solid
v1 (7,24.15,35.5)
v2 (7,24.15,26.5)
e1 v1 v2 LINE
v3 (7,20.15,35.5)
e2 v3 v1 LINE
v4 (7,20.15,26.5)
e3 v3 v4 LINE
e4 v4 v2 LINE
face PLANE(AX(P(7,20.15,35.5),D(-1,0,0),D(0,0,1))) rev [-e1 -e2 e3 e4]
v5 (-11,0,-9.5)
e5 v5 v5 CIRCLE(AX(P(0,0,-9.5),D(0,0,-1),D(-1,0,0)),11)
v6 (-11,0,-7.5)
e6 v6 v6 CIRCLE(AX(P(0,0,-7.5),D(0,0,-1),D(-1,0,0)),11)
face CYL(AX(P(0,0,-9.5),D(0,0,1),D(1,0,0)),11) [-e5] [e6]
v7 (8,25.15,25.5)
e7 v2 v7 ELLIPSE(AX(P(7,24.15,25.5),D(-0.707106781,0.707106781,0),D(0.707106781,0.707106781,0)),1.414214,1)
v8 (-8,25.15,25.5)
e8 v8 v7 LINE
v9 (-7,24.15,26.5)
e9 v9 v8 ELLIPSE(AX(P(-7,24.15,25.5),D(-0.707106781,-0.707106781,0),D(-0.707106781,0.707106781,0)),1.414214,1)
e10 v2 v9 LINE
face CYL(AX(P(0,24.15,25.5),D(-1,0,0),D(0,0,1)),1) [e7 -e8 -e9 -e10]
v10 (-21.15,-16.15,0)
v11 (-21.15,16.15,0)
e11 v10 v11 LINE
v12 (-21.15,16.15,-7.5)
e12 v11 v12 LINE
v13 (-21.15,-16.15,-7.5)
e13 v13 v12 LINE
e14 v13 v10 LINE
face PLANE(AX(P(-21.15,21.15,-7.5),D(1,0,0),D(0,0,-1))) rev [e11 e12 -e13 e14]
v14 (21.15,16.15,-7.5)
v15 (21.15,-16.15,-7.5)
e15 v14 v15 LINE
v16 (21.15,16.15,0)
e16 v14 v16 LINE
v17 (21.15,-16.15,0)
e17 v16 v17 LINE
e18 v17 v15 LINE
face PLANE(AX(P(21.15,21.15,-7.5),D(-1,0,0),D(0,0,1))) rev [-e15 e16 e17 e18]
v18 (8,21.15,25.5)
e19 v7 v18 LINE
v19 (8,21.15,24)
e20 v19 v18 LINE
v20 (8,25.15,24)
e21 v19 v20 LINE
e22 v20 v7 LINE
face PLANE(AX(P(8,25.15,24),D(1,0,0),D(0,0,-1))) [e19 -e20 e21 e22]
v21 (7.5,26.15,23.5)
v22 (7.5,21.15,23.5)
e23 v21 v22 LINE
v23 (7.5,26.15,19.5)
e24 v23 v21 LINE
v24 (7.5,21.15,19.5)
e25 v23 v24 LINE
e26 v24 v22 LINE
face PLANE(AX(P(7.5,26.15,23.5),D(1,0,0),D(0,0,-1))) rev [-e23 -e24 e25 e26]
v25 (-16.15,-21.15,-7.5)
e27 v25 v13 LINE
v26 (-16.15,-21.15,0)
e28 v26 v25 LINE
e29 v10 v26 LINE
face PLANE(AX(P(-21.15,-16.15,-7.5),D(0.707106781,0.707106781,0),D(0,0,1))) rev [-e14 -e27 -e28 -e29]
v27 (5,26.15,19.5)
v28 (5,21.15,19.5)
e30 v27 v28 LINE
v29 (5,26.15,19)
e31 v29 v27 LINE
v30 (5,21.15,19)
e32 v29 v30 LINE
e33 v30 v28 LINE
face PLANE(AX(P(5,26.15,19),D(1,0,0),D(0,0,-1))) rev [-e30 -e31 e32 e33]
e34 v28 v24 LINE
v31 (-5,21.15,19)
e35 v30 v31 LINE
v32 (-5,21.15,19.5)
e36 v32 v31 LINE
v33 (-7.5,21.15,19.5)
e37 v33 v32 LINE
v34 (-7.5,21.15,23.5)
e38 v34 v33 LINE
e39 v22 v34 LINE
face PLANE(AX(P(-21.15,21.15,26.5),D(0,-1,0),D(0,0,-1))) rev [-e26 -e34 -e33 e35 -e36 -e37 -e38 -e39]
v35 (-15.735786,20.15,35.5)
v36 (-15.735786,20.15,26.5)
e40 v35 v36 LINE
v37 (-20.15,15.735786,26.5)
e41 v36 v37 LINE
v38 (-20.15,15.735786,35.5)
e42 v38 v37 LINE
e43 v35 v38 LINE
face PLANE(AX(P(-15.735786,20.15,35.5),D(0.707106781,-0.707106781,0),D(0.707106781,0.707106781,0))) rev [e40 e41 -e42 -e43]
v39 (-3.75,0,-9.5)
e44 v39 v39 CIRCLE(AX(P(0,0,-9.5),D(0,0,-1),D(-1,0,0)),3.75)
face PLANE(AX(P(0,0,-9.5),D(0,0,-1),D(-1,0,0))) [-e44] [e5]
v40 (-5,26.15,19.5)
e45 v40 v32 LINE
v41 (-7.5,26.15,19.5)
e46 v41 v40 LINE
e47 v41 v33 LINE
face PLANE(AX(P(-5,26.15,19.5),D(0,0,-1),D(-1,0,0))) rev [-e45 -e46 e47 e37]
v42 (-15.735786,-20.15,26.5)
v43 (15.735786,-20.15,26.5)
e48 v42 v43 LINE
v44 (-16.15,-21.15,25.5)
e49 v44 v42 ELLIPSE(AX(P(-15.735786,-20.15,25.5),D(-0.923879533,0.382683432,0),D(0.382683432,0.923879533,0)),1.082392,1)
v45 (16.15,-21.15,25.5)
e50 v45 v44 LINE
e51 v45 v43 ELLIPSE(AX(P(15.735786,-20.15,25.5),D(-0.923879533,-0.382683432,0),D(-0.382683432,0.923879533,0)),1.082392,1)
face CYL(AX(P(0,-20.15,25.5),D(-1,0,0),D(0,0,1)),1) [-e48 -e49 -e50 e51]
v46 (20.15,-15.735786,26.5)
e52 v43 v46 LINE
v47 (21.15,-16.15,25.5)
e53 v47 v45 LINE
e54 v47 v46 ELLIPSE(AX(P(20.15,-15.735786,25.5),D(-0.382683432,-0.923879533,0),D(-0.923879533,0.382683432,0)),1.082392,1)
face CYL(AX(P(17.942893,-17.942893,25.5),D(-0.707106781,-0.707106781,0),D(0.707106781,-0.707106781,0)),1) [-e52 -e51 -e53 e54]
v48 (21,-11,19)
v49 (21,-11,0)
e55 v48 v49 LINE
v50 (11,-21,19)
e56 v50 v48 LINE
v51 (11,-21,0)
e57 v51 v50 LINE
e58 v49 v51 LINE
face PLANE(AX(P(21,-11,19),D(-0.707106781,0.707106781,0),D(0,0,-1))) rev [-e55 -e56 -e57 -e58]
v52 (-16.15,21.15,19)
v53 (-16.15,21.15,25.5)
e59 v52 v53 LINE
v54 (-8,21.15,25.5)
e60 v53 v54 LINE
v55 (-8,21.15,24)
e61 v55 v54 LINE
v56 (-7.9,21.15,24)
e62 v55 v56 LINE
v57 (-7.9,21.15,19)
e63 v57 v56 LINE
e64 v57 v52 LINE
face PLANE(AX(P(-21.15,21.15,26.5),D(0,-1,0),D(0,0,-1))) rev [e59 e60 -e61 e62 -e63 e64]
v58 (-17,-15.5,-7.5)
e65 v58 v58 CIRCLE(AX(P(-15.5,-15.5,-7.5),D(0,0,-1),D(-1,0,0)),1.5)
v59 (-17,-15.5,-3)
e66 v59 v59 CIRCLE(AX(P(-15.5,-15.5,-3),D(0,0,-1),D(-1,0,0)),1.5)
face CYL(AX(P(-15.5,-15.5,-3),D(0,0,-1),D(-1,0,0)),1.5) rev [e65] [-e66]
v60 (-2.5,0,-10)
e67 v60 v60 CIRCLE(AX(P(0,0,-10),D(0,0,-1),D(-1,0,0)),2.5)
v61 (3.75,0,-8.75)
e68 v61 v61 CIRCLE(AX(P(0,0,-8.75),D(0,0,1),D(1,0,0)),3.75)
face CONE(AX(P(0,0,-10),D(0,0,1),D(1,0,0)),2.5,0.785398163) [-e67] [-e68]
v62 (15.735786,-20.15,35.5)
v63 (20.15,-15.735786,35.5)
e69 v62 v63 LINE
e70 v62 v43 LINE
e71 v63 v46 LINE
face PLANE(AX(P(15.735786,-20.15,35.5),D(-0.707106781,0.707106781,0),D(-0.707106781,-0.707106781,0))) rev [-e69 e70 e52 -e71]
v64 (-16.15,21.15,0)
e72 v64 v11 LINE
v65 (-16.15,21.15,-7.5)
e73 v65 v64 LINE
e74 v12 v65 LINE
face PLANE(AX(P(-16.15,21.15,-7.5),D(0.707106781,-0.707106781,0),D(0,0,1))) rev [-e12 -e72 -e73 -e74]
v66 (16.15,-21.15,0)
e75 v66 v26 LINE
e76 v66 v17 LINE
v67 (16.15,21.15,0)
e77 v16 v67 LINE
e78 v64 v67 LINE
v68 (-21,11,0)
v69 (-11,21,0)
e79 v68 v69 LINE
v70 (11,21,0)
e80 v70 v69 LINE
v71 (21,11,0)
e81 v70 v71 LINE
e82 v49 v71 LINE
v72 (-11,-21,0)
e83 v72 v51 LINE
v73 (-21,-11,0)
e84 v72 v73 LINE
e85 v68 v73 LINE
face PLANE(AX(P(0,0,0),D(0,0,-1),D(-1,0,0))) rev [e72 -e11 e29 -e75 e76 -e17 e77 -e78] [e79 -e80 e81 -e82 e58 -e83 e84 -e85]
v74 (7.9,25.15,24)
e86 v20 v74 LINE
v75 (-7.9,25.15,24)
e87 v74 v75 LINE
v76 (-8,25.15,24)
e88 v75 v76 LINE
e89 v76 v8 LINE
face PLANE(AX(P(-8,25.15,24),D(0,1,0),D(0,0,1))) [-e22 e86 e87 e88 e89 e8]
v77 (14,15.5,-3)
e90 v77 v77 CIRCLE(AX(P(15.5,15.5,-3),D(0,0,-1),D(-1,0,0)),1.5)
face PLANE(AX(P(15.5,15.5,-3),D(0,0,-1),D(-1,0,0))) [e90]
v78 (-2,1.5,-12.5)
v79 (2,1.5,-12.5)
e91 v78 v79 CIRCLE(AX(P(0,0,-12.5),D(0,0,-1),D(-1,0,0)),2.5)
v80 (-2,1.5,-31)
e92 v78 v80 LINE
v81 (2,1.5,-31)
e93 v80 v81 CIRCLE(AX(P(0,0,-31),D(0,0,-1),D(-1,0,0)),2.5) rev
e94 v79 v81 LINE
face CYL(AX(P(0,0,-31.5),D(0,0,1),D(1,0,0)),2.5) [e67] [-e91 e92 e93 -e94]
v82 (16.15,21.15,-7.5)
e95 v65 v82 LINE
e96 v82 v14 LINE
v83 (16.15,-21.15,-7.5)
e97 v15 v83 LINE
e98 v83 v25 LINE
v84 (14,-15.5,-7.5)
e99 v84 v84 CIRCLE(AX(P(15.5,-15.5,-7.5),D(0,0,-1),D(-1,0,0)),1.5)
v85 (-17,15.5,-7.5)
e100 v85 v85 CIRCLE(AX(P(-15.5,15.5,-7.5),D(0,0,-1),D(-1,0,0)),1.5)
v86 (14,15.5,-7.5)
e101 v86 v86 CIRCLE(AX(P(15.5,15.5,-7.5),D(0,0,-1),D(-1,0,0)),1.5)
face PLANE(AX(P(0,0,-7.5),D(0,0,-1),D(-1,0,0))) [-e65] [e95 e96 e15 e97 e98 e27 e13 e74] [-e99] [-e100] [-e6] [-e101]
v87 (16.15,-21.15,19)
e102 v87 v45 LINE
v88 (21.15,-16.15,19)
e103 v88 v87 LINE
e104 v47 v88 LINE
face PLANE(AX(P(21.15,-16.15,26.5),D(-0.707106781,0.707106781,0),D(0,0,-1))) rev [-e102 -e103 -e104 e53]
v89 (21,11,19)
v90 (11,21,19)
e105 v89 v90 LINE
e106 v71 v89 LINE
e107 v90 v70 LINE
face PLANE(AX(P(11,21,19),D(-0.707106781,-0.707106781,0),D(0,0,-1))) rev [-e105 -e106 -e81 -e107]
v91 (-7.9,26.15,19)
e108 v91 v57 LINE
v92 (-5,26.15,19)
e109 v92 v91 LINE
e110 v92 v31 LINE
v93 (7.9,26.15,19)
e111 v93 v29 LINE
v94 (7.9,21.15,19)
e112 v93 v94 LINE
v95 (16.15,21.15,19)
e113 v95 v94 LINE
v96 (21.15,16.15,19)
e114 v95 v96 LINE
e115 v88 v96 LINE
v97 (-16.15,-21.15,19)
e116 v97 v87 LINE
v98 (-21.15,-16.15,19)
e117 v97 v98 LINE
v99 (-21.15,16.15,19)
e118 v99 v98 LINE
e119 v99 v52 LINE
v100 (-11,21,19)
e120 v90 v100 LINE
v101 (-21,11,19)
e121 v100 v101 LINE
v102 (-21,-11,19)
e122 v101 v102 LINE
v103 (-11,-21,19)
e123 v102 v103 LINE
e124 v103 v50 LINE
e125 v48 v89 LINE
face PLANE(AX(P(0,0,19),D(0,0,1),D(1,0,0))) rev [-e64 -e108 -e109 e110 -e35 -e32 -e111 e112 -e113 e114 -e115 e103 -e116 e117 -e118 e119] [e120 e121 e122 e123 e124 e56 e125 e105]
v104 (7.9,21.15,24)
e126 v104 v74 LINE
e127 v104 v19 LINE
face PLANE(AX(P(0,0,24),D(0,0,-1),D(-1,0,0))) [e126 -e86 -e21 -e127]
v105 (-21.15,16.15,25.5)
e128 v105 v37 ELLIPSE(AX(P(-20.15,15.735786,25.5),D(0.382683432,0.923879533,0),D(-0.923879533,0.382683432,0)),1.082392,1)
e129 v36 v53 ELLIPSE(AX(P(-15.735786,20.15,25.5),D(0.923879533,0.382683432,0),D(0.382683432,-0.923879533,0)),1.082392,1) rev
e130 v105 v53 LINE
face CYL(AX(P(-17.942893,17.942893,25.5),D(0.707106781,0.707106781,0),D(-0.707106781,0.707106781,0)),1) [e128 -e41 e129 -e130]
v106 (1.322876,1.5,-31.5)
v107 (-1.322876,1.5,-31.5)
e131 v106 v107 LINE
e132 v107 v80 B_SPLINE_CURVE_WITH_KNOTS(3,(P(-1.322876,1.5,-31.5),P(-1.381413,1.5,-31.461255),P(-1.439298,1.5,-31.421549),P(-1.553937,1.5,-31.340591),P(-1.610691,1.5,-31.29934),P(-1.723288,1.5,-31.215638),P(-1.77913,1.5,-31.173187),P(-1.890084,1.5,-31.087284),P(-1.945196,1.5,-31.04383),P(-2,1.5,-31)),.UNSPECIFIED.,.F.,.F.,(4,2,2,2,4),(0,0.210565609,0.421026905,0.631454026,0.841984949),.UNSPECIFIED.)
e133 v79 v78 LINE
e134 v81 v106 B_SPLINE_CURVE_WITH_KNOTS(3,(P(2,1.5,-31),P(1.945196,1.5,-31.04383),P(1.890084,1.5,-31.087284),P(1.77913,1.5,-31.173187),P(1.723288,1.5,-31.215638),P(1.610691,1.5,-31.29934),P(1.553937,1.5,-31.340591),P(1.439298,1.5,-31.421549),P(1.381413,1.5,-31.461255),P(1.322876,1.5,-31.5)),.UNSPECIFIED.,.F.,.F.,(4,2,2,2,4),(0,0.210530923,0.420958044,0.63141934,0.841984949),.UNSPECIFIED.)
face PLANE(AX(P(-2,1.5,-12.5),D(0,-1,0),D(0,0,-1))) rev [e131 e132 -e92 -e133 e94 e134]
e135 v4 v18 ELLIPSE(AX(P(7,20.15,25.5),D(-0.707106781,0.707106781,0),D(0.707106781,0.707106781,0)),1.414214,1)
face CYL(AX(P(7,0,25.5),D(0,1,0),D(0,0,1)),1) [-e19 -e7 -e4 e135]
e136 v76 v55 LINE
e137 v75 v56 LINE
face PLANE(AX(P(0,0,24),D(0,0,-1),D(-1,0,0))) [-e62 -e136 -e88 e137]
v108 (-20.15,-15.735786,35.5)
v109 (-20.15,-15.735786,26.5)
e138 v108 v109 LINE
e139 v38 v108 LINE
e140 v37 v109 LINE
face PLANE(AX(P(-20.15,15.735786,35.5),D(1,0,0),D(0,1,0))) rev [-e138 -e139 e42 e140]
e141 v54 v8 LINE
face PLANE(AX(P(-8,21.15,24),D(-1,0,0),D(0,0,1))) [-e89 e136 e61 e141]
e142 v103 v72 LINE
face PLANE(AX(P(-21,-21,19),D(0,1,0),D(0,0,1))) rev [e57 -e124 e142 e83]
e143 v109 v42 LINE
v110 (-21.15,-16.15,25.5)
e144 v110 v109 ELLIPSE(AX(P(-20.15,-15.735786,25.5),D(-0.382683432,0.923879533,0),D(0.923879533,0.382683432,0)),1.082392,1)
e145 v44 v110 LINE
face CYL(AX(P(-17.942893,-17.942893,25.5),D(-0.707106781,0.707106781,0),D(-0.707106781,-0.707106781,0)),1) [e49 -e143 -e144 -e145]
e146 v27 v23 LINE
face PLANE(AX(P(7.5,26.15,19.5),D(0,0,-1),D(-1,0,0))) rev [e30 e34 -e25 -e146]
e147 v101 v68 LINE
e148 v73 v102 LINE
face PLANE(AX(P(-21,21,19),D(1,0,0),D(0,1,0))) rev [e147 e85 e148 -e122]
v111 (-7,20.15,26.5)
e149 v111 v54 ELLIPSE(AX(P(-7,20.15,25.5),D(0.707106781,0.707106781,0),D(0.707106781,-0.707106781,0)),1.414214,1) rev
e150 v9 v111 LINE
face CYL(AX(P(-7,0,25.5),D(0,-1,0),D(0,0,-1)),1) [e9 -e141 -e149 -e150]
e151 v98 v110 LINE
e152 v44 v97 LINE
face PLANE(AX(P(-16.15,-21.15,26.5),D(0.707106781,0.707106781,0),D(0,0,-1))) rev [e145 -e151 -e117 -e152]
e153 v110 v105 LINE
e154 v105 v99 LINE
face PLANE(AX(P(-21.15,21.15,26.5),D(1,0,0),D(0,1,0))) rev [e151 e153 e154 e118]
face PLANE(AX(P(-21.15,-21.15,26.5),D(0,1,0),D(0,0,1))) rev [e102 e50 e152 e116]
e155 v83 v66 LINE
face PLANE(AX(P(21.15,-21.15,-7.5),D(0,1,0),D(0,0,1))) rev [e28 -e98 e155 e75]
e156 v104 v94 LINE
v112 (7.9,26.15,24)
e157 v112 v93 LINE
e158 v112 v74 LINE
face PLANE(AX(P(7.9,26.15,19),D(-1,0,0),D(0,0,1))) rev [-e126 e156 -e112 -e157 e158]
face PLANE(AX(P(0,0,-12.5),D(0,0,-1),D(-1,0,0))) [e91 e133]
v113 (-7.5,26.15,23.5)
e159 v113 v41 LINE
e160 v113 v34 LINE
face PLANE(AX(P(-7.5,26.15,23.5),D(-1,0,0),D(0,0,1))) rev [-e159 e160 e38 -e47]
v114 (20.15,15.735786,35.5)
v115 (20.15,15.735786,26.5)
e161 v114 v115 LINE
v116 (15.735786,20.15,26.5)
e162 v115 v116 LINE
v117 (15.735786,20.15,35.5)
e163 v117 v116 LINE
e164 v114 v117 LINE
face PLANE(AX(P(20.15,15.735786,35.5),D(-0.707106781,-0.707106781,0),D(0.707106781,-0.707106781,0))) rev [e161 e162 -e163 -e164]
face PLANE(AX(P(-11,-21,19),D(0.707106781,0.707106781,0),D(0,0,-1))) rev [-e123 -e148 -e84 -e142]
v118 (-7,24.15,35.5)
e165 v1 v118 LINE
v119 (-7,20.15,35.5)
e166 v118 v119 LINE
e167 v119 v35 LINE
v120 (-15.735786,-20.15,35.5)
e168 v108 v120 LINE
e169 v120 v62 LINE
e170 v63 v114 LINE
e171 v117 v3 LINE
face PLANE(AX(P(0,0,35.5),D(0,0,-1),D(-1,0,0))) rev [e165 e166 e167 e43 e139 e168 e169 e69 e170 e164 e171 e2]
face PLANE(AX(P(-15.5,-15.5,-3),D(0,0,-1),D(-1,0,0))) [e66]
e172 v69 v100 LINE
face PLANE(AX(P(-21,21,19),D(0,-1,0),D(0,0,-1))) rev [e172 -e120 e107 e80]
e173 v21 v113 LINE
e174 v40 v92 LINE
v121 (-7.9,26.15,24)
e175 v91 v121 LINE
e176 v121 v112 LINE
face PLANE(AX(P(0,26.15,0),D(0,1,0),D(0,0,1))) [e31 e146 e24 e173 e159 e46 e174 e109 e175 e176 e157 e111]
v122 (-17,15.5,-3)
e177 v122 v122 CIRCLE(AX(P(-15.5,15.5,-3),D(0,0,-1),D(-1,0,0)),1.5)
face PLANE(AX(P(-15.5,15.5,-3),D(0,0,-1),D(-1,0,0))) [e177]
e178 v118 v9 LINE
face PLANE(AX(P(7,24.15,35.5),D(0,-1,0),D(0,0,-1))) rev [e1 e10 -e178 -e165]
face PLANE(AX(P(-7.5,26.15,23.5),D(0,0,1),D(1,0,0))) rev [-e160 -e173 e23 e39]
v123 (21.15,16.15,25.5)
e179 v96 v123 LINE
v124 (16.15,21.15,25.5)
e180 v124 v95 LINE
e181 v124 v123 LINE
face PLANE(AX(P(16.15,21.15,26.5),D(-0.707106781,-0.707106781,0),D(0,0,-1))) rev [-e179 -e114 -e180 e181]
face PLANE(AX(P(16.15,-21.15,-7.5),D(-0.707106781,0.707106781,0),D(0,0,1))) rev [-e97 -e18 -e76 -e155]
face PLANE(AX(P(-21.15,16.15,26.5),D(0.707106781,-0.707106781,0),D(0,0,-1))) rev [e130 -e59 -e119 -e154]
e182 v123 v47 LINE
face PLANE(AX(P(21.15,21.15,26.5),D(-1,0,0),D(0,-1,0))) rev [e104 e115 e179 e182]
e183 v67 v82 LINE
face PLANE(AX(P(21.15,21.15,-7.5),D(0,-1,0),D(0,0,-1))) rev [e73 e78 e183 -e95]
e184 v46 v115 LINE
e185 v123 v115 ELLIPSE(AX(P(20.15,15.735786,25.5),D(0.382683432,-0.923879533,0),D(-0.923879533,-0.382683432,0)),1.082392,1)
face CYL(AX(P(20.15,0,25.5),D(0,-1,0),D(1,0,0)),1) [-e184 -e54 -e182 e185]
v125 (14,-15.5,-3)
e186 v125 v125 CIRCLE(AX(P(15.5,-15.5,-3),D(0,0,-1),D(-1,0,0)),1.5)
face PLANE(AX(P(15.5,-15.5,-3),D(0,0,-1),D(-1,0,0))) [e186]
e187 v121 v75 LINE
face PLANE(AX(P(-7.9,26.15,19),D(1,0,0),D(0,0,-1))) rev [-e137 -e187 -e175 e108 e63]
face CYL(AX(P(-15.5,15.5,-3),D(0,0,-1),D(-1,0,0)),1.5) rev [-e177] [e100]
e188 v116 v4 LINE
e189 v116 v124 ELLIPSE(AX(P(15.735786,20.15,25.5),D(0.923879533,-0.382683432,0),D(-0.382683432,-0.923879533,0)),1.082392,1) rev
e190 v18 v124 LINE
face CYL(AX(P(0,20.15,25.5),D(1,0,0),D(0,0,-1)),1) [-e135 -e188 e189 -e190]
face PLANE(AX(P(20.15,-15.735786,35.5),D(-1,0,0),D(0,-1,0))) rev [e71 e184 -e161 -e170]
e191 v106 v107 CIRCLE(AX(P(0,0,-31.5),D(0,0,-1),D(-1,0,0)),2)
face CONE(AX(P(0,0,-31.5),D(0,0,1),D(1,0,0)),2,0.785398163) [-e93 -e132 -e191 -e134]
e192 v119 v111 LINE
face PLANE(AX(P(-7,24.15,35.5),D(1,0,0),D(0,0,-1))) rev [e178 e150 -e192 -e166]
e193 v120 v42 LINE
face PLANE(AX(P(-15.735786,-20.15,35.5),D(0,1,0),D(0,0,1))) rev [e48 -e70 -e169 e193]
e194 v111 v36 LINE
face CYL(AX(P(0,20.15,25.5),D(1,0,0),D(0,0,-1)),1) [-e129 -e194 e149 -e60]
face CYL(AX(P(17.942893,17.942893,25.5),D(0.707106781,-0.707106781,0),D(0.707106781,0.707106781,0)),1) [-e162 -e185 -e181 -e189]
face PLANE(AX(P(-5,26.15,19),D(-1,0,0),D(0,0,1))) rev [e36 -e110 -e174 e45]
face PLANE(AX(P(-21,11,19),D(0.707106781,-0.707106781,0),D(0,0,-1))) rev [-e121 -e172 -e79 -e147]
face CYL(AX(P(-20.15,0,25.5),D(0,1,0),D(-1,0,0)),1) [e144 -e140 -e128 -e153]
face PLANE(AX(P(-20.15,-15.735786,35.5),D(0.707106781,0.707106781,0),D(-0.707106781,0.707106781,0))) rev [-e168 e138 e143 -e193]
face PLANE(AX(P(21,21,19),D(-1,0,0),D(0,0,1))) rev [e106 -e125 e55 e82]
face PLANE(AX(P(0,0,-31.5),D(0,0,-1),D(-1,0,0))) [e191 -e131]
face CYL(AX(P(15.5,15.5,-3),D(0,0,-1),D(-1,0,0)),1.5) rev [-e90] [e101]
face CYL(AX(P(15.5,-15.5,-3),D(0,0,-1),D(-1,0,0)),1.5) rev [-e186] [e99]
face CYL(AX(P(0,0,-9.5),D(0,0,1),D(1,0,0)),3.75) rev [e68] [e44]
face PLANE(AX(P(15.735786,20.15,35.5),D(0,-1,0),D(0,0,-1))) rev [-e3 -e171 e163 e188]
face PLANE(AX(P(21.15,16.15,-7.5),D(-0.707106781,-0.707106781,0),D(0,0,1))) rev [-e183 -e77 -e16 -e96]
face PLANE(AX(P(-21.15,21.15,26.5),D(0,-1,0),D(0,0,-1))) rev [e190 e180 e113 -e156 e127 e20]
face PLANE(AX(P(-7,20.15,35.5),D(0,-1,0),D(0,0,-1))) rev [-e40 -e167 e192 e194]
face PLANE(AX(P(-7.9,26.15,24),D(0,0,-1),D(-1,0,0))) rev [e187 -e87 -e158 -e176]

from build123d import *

# Parameters (mm, degrees)
SKETCH_1_W          = 42
SKETCH_1_H          = 42
EXTRUDE_1_DEPTH     = 19
CHAMFER_1_SIZE      = 10
SKETCH_2_W          = 42.3
SKETCH_2_H          = 42.3
EXTRUDE_2_DEPTH     = 7.5
SKETCH_3_W          = 42.3
SKETCH_3_H          = 42.3
EXTRUDE_3_DEPTH     = 7.5
CHAMFER_2_SIZE      = 5
SKETCH_4_R          = 1.5
CUT_EXTRUDE_1_DEPTH = 4.5
SKETCH_5_R          = 11
SKETCH_5_R_2        = 3.75
EXTRUDE_4_DEPTH     = 2
SKETCH_6_R          = 2.5
EXTRUDE_5_DEPTH     = 24
CUT_EXTRUDE_START   = -19
CUT_EXTRUDE_2_DEPTH = 19
CHAMFER_3_SIZE      = 0.5
EXTRUDE_6_DEPTH     = 2.5
FILLET_1_R          = 1
EXTRUDE_7_DEPTH     = 5
EXTRUDE_8_DEPTH     = 9
CHAMFER_4_SIZE      = 2.5


with BuildPart() as part:
    # 草图1 → 凸台-拉伸1 (new body)
    with BuildSketch(Plane.XY):
        Rectangle(SKETCH_1_W, SKETCH_1_H)
    extrude(amount=EXTRUDE_1_DEPTH)

    # 倒角1
    chamfer_1_edges = [part.edges().sort_by_distance(p)[0] for p in [
        (21, -21, 9.5),
        (-21, -21, 9.5),
        (-21, 21, 9.5),
        (21, 21, 9.5),
    ]]
    chamfer(chamfer_1_edges, length=CHAMFER_1_SIZE)

    # 草图2 → 凸台-拉伸2 (add)
    with BuildSketch(Plane.XY.offset(19)):
        Rectangle(SKETCH_2_W, SKETCH_2_H)
    extrude(amount=EXTRUDE_2_DEPTH)

    # 草图3 → 凸台-拉伸3 (add)
    with BuildSketch(Plane(origin=(0, 0, 0), x_dir=(-1, 0, 0), z_dir=(0, 0, -1))):
        Rectangle(SKETCH_3_W, SKETCH_3_H)
    extrude(amount=EXTRUDE_3_DEPTH)

    # 倒角2
    chamfer_2_edges = [part.edges().sort_by_distance(p)[0] for p in [
        (21.15, -21.15, 22.75),
        (21.15, 21.15, 22.75),
        (-21.15, 21.15, 22.75),
        (-21.15, -21.15, 22.75),
        (-21.15, -21.15, -3.75),
        (-21.15, 21.15, -3.75),
        (21.15, 21.15, -3.75),
        (21.15, -21.15, -3.75),
    ]]
    chamfer(chamfer_2_edges, length=CHAMFER_2_SIZE)

    # 草图4 → 切除-拉伸1 (cut)
    with BuildSketch(Plane(origin=(0, 0, -7.5), x_dir=(-1, 0, 0), z_dir=(0, 0, -1))):
        with Locations((-15.5, 15.5)):
            Circle(SKETCH_4_R)
        with Locations((15.5, 15.5)):
            Circle(SKETCH_4_R)
        with Locations((15.5, -15.5)):
            Circle(SKETCH_4_R)
        with Locations((-15.5, -15.5)):
            Circle(SKETCH_4_R)
    extrude(amount=-CUT_EXTRUDE_1_DEPTH, mode=Mode.SUBTRACT)

    # 草图5 → 凸台-拉伸4 (add)
    with BuildSketch(Plane(origin=(0, 0, -7.5), x_dir=(-1, 0, 0), z_dir=(0, 0, -1))):
        Circle(SKETCH_5_R)
        Circle(SKETCH_5_R_2, mode=Mode.SUBTRACT)
    extrude(amount=EXTRUDE_4_DEPTH)

    # 草图6 → 凸台-拉伸5 (add)
    with BuildSketch(Plane(origin=(0, 0, -7.5), x_dir=(-1, 0, 0), z_dir=(0, 0, -1))):
        Circle(SKETCH_6_R)
    extrude(amount=EXTRUDE_5_DEPTH)

    # 草图7 → 切除-拉伸2 (cut)
    with BuildSketch(Plane(origin=(0, 0, -31.5), x_dir=(-1, 0, 0), z_dir=(0, 0, -1)).offset(CUT_EXTRUDE_START)):
        with BuildLine():
            Line((2, 1.5), (-2, 1.5))
            ThreePointArc((-2, 1.5), (0, 2.5), (2, 1.5))
        make_face()
    extrude(amount=CUT_EXTRUDE_2_DEPTH, mode=Mode.SUBTRACT)

    # 倒角3
    chamfer_3_edges = [part.edges().sort_by_distance(p)[0] for p in [
        (0.790569415, -2.371708245, -31.5),
    ]]
    chamfer(chamfer_3_edges, length=CHAMFER_3_SIZE)

    # 草图8 → 凸台-拉伸6 (add)
    with BuildSketch(Plane.XY.offset(26.5)):
        Polygon((0, 21.15), (-8, 21.15), (-8, 25.15), (8, 25.15), (8, 21.15), align=None)
    extrude(amount=-EXTRUDE_6_DEPTH)

    # 圆角1
    fillet_1_edges = [part.edges().sort_by_distance(p)[0] for p in [
        (-12.075, 21.15, 26.5),
        (8, 23.15, 26.5),
        (0, 25.15, 26.5),
        (-8, 23.15, 26.5),
        (0, -21.15, 26.5),
        (-21.15, 0, 26.5),
        (21.15, 0, 26.5),
        (12.075, 21.15, 26.5),
        (-18.65, 18.65, 26.5),
        (18.65, 18.65, 26.5),
        (18.65, -18.65, 26.5),
        (-18.65, -18.65, 26.5),
    ]]
    fillet(fillet_1_edges, radius=FILLET_1_R)

    # 草图9 → 凸台-拉伸7 (add)
    with BuildSketch(Plane(origin=(0, 21.15, 0), x_dir=(1, 0, 0), z_dir=(0, 1, 0))):
        Polygon((7.9, -19), (5, -19), (5, -19.5), (7.5, -19.5), (7.5, -23.5), (-7.5, -23.5), (-7.5, -19.5), (-5, -19.5), (-5, -19), (-7.9, -19), (-7.9, -24), (7.9, -24), align=None)
    extrude(amount=EXTRUDE_7_DEPTH)

    # 草图10 → 凸台-拉伸8 (add)
    with BuildSketch(Plane.XY.offset(26.5)):
        Polygon((-7, 20.15), (-15.735786438, 20.15), (-20.15, 15.735786438), (-20.15, -15.735786438), (-15.735786438, -20.15), (15.735786438, -20.15), (20.15, -15.735786438), (20.15, 15.735786438), (15.735786438, 20.15), (7, 20.15), (7, 24.15), (-7, 24.15), align=None)
    extrude(amount=EXTRUDE_8_DEPTH)

    # 倒角4
    # the kernel refuses this chamfer: 2.5 mm, written as the material it adds along each edge
    with BuildSketch(Plane(origin=(0, 0, -7.5), x_dir=(-1, 0, 0), z_dir=(0, -1, 0))) as chamfer_4_piece_1:
        Polygon((2.5 + CHAMFER_4_SIZE, 0), (2.5, CHAMFER_4_SIZE), (2.5, 0), align=None)
    revolve(axis=Axis((0, 0, -7.5), (0, 0, -1)))


solid = part.part
